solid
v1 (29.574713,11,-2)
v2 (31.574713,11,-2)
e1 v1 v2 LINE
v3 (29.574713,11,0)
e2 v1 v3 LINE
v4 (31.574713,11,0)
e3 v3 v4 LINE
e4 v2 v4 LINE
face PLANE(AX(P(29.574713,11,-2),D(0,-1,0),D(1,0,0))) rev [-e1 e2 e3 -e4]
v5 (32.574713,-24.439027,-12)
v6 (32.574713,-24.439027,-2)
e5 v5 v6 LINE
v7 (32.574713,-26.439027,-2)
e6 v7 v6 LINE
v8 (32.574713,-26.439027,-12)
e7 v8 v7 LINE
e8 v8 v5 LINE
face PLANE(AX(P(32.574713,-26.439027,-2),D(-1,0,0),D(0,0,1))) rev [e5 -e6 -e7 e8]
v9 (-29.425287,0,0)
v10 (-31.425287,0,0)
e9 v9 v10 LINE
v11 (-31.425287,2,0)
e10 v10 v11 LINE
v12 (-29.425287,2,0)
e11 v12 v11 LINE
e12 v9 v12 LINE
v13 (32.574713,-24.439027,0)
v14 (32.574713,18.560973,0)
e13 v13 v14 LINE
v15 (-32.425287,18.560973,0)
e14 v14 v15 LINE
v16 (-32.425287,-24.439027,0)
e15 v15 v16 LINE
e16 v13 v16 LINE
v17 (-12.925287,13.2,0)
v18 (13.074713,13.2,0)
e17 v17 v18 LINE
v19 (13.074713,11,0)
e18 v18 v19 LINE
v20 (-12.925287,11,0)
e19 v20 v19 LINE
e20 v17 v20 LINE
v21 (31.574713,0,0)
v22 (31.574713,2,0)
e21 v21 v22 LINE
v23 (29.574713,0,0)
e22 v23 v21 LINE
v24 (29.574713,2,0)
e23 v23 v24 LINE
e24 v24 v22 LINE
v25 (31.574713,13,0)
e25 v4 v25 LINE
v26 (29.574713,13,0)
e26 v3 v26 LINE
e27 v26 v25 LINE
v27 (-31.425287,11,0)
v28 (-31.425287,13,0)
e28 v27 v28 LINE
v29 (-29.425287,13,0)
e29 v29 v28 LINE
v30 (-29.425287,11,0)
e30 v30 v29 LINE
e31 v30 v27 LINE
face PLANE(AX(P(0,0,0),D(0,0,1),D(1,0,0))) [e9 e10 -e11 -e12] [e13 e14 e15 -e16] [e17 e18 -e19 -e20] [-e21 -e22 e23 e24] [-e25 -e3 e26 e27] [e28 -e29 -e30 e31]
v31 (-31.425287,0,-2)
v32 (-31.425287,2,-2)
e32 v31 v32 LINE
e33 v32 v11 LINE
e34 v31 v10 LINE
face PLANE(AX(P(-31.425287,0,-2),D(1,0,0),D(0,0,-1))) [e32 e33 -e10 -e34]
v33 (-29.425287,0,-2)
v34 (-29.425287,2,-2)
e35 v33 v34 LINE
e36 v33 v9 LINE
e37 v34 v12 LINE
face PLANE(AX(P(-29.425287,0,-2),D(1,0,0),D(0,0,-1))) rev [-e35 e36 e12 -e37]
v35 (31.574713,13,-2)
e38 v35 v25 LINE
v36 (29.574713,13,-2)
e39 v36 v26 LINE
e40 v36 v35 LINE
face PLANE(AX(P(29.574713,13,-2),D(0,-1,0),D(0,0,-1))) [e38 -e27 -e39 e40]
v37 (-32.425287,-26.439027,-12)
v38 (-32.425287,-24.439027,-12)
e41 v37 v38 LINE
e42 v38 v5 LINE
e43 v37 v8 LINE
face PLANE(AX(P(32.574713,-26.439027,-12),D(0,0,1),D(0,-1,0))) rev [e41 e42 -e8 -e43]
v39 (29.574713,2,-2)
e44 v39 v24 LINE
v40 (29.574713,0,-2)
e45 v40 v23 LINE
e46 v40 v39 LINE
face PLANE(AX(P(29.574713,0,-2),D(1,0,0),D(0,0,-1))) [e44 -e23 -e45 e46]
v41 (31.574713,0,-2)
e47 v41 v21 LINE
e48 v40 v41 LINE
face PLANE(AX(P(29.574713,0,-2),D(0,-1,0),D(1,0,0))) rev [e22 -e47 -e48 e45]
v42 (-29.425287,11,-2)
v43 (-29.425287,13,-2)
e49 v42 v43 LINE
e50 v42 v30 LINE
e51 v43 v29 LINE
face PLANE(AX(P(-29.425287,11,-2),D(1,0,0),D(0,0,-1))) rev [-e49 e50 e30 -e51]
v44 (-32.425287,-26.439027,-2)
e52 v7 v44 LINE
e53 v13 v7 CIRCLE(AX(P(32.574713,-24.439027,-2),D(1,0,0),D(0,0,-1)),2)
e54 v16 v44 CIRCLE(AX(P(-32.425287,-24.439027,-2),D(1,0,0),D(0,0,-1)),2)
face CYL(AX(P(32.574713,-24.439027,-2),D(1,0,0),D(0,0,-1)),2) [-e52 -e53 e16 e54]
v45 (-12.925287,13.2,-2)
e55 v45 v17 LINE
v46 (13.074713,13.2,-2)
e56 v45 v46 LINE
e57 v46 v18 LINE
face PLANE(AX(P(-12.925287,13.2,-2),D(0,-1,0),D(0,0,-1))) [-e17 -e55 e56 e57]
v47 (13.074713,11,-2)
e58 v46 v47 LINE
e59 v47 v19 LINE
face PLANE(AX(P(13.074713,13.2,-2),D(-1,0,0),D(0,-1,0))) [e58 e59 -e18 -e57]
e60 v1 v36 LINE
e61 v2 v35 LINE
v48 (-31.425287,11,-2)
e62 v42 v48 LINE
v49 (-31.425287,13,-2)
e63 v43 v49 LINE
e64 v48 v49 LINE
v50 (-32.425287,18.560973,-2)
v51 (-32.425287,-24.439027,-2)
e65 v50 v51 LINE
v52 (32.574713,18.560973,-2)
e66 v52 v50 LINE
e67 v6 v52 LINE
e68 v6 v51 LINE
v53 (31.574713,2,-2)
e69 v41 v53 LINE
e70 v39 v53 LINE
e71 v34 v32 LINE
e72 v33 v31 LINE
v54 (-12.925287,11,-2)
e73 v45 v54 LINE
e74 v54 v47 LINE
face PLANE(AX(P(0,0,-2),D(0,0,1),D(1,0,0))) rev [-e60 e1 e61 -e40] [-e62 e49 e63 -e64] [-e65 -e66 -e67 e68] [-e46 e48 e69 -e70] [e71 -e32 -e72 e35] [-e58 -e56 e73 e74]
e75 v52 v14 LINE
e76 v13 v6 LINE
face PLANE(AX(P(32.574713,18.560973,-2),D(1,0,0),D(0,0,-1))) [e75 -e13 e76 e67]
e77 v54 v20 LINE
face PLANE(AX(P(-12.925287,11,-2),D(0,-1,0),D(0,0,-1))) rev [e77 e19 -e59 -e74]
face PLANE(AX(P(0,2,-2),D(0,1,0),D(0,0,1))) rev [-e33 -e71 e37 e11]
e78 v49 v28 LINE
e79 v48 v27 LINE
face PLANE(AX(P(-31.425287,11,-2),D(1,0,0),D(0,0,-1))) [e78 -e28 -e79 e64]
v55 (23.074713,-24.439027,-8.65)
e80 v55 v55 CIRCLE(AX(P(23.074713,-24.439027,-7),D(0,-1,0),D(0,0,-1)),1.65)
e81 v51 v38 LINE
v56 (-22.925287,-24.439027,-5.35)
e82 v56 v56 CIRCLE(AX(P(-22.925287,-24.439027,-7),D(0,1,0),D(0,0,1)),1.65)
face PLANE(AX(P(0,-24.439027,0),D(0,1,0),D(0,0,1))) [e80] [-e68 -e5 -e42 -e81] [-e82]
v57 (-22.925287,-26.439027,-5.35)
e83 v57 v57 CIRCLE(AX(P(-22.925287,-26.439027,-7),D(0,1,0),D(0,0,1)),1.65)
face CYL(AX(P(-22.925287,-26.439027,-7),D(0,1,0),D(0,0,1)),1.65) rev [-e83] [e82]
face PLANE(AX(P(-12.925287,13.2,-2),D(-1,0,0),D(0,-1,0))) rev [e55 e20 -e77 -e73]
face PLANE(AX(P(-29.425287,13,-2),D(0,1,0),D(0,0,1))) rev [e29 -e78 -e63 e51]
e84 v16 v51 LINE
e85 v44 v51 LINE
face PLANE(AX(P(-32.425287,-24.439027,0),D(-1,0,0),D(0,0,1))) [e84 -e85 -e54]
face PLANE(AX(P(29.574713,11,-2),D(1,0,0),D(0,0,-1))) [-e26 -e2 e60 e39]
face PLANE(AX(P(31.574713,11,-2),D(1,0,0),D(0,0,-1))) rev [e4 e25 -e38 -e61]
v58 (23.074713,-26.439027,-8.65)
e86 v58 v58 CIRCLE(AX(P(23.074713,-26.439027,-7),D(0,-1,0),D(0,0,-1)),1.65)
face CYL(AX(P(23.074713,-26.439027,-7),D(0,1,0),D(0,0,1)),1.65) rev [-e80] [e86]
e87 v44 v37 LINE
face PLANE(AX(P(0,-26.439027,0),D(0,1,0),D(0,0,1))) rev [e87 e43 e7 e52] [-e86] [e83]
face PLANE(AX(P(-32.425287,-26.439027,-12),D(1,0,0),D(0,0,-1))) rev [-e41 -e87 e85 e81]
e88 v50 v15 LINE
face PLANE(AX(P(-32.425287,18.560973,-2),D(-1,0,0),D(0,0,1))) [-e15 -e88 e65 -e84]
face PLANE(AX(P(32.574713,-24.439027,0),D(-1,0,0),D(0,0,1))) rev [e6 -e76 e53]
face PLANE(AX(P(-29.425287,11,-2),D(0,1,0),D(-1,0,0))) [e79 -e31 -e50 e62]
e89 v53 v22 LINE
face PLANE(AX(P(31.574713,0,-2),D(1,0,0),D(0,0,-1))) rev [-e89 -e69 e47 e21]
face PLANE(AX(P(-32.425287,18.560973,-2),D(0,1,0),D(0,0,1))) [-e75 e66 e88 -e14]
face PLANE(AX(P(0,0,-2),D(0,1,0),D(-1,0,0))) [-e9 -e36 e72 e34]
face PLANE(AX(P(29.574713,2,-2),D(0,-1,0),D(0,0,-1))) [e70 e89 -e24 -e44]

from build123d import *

# Parameters (mm, degrees)
SKETCH_1_W                   = 65
SKETCH_1_H                   = 45
SM_BASE_FLANGE_1_DEPTH       = 2
SM_START                     = -32.425287356
SM_EDGE_FLANGE_1_DEPTH       = 65
SM_EDGE_FLANGE_1_2_OUTLINE_W = 2
SM_EDGE_FLANGE_1_2_OUTLINE_H = 10
SM_EDGE_FLANGE_1_2_DEPTH     = 65
SKETCH_9_W                   = 2
SKETCH_9_H                   = 2
SKETCH_9_W_2                 = 26
SKETCH_9_H_2                 = 2.2
CUT_EXTRUDE_1_DEPTH          = 10
SKETCH_11_R                  = 1.65
CUT_EXTRUDE_3_DEPTH          = 10


# Read off the part's stored shape, not the designer's step: 边线-法兰1
# Sheet-metal steps are written as plain solids
with BuildPart() as part:
    # Sketch 1 → 基体-法兰1 (new body)
    with BuildSketch(Plane.XY):
        with Locations((0.074712644, -3.939027096)):
            Rectangle(SKETCH_1_W, SKETCH_1_H)
    extrude(amount=-SM_BASE_FLANGE_1_DEPTH)

    # 边线-法兰1 outline → 边线-法兰1 (cut)
    with BuildSketch(Plane.YZ.offset(SM_START)):
        with BuildLine():
            ThreePointArc((-26.439027096, -2), (-25.853240658, -0.585786437), (-24.439027096, 0))
            Line((-24.439027096, 0), (-26.439027096, 0))
            Line((-26.439027096, 0), (-26.439027096, -2))
        make_face()
    extrude(amount=SM_EDGE_FLANGE_1_DEPTH, mode=Mode.SUBTRACT)

    # Sm Edge Flange 1 2 outline → Sm Edge Flange 1 2 (add)
    with BuildSketch(Plane.YZ.offset(SM_START)):
        with Locations((-25.439027096, -7)):
            Rectangle(SM_EDGE_FLANGE_1_2_OUTLINE_W, SM_EDGE_FLANGE_1_2_OUTLINE_H)
    extrude(amount=SM_EDGE_FLANGE_1_2_DEPTH)

    # 草图9 → 切除-拉伸1 (cut)
    with BuildSketch(Plane.XY):
        with Locations((-30.425287356, 1)):
            Rectangle(SKETCH_9_W, SKETCH_9_H)
        with Locations((0.074712644, 12.1)):
            Rectangle(SKETCH_9_W_2, SKETCH_9_H_2)
        with Locations((30.574712644, 12)):
            Rectangle(SKETCH_9_W, SKETCH_9_H)
        with Locations((-30.425287356, 12)):
            Rectangle(SKETCH_9_W, SKETCH_9_H)
        with Locations((30.574712644, 1)):
            Rectangle(SKETCH_9_W, SKETCH_9_H)
    extrude(amount=-CUT_EXTRUDE_1_DEPTH, mode=Mode.SUBTRACT)

    # 草图11 → 切除-拉伸3 (cut)
    with BuildSketch(Plane(origin=(0, -24.439027096, 0), x_dir=(1, 0, 0), z_dir=(0, 1, 0))):
        with Locations(Location((-22.925287356, 7, 0), (0, 0, 270))):
            Circle(SKETCH_11_R)
        with Locations(Location((23.074712644, 7, 0), (0, 0, 90))):
            Circle(SKETCH_11_R)
    extrude(amount=-CUT_EXTRUDE_3_DEPTH, mode=Mode.SUBTRACT)


solid = part.part
